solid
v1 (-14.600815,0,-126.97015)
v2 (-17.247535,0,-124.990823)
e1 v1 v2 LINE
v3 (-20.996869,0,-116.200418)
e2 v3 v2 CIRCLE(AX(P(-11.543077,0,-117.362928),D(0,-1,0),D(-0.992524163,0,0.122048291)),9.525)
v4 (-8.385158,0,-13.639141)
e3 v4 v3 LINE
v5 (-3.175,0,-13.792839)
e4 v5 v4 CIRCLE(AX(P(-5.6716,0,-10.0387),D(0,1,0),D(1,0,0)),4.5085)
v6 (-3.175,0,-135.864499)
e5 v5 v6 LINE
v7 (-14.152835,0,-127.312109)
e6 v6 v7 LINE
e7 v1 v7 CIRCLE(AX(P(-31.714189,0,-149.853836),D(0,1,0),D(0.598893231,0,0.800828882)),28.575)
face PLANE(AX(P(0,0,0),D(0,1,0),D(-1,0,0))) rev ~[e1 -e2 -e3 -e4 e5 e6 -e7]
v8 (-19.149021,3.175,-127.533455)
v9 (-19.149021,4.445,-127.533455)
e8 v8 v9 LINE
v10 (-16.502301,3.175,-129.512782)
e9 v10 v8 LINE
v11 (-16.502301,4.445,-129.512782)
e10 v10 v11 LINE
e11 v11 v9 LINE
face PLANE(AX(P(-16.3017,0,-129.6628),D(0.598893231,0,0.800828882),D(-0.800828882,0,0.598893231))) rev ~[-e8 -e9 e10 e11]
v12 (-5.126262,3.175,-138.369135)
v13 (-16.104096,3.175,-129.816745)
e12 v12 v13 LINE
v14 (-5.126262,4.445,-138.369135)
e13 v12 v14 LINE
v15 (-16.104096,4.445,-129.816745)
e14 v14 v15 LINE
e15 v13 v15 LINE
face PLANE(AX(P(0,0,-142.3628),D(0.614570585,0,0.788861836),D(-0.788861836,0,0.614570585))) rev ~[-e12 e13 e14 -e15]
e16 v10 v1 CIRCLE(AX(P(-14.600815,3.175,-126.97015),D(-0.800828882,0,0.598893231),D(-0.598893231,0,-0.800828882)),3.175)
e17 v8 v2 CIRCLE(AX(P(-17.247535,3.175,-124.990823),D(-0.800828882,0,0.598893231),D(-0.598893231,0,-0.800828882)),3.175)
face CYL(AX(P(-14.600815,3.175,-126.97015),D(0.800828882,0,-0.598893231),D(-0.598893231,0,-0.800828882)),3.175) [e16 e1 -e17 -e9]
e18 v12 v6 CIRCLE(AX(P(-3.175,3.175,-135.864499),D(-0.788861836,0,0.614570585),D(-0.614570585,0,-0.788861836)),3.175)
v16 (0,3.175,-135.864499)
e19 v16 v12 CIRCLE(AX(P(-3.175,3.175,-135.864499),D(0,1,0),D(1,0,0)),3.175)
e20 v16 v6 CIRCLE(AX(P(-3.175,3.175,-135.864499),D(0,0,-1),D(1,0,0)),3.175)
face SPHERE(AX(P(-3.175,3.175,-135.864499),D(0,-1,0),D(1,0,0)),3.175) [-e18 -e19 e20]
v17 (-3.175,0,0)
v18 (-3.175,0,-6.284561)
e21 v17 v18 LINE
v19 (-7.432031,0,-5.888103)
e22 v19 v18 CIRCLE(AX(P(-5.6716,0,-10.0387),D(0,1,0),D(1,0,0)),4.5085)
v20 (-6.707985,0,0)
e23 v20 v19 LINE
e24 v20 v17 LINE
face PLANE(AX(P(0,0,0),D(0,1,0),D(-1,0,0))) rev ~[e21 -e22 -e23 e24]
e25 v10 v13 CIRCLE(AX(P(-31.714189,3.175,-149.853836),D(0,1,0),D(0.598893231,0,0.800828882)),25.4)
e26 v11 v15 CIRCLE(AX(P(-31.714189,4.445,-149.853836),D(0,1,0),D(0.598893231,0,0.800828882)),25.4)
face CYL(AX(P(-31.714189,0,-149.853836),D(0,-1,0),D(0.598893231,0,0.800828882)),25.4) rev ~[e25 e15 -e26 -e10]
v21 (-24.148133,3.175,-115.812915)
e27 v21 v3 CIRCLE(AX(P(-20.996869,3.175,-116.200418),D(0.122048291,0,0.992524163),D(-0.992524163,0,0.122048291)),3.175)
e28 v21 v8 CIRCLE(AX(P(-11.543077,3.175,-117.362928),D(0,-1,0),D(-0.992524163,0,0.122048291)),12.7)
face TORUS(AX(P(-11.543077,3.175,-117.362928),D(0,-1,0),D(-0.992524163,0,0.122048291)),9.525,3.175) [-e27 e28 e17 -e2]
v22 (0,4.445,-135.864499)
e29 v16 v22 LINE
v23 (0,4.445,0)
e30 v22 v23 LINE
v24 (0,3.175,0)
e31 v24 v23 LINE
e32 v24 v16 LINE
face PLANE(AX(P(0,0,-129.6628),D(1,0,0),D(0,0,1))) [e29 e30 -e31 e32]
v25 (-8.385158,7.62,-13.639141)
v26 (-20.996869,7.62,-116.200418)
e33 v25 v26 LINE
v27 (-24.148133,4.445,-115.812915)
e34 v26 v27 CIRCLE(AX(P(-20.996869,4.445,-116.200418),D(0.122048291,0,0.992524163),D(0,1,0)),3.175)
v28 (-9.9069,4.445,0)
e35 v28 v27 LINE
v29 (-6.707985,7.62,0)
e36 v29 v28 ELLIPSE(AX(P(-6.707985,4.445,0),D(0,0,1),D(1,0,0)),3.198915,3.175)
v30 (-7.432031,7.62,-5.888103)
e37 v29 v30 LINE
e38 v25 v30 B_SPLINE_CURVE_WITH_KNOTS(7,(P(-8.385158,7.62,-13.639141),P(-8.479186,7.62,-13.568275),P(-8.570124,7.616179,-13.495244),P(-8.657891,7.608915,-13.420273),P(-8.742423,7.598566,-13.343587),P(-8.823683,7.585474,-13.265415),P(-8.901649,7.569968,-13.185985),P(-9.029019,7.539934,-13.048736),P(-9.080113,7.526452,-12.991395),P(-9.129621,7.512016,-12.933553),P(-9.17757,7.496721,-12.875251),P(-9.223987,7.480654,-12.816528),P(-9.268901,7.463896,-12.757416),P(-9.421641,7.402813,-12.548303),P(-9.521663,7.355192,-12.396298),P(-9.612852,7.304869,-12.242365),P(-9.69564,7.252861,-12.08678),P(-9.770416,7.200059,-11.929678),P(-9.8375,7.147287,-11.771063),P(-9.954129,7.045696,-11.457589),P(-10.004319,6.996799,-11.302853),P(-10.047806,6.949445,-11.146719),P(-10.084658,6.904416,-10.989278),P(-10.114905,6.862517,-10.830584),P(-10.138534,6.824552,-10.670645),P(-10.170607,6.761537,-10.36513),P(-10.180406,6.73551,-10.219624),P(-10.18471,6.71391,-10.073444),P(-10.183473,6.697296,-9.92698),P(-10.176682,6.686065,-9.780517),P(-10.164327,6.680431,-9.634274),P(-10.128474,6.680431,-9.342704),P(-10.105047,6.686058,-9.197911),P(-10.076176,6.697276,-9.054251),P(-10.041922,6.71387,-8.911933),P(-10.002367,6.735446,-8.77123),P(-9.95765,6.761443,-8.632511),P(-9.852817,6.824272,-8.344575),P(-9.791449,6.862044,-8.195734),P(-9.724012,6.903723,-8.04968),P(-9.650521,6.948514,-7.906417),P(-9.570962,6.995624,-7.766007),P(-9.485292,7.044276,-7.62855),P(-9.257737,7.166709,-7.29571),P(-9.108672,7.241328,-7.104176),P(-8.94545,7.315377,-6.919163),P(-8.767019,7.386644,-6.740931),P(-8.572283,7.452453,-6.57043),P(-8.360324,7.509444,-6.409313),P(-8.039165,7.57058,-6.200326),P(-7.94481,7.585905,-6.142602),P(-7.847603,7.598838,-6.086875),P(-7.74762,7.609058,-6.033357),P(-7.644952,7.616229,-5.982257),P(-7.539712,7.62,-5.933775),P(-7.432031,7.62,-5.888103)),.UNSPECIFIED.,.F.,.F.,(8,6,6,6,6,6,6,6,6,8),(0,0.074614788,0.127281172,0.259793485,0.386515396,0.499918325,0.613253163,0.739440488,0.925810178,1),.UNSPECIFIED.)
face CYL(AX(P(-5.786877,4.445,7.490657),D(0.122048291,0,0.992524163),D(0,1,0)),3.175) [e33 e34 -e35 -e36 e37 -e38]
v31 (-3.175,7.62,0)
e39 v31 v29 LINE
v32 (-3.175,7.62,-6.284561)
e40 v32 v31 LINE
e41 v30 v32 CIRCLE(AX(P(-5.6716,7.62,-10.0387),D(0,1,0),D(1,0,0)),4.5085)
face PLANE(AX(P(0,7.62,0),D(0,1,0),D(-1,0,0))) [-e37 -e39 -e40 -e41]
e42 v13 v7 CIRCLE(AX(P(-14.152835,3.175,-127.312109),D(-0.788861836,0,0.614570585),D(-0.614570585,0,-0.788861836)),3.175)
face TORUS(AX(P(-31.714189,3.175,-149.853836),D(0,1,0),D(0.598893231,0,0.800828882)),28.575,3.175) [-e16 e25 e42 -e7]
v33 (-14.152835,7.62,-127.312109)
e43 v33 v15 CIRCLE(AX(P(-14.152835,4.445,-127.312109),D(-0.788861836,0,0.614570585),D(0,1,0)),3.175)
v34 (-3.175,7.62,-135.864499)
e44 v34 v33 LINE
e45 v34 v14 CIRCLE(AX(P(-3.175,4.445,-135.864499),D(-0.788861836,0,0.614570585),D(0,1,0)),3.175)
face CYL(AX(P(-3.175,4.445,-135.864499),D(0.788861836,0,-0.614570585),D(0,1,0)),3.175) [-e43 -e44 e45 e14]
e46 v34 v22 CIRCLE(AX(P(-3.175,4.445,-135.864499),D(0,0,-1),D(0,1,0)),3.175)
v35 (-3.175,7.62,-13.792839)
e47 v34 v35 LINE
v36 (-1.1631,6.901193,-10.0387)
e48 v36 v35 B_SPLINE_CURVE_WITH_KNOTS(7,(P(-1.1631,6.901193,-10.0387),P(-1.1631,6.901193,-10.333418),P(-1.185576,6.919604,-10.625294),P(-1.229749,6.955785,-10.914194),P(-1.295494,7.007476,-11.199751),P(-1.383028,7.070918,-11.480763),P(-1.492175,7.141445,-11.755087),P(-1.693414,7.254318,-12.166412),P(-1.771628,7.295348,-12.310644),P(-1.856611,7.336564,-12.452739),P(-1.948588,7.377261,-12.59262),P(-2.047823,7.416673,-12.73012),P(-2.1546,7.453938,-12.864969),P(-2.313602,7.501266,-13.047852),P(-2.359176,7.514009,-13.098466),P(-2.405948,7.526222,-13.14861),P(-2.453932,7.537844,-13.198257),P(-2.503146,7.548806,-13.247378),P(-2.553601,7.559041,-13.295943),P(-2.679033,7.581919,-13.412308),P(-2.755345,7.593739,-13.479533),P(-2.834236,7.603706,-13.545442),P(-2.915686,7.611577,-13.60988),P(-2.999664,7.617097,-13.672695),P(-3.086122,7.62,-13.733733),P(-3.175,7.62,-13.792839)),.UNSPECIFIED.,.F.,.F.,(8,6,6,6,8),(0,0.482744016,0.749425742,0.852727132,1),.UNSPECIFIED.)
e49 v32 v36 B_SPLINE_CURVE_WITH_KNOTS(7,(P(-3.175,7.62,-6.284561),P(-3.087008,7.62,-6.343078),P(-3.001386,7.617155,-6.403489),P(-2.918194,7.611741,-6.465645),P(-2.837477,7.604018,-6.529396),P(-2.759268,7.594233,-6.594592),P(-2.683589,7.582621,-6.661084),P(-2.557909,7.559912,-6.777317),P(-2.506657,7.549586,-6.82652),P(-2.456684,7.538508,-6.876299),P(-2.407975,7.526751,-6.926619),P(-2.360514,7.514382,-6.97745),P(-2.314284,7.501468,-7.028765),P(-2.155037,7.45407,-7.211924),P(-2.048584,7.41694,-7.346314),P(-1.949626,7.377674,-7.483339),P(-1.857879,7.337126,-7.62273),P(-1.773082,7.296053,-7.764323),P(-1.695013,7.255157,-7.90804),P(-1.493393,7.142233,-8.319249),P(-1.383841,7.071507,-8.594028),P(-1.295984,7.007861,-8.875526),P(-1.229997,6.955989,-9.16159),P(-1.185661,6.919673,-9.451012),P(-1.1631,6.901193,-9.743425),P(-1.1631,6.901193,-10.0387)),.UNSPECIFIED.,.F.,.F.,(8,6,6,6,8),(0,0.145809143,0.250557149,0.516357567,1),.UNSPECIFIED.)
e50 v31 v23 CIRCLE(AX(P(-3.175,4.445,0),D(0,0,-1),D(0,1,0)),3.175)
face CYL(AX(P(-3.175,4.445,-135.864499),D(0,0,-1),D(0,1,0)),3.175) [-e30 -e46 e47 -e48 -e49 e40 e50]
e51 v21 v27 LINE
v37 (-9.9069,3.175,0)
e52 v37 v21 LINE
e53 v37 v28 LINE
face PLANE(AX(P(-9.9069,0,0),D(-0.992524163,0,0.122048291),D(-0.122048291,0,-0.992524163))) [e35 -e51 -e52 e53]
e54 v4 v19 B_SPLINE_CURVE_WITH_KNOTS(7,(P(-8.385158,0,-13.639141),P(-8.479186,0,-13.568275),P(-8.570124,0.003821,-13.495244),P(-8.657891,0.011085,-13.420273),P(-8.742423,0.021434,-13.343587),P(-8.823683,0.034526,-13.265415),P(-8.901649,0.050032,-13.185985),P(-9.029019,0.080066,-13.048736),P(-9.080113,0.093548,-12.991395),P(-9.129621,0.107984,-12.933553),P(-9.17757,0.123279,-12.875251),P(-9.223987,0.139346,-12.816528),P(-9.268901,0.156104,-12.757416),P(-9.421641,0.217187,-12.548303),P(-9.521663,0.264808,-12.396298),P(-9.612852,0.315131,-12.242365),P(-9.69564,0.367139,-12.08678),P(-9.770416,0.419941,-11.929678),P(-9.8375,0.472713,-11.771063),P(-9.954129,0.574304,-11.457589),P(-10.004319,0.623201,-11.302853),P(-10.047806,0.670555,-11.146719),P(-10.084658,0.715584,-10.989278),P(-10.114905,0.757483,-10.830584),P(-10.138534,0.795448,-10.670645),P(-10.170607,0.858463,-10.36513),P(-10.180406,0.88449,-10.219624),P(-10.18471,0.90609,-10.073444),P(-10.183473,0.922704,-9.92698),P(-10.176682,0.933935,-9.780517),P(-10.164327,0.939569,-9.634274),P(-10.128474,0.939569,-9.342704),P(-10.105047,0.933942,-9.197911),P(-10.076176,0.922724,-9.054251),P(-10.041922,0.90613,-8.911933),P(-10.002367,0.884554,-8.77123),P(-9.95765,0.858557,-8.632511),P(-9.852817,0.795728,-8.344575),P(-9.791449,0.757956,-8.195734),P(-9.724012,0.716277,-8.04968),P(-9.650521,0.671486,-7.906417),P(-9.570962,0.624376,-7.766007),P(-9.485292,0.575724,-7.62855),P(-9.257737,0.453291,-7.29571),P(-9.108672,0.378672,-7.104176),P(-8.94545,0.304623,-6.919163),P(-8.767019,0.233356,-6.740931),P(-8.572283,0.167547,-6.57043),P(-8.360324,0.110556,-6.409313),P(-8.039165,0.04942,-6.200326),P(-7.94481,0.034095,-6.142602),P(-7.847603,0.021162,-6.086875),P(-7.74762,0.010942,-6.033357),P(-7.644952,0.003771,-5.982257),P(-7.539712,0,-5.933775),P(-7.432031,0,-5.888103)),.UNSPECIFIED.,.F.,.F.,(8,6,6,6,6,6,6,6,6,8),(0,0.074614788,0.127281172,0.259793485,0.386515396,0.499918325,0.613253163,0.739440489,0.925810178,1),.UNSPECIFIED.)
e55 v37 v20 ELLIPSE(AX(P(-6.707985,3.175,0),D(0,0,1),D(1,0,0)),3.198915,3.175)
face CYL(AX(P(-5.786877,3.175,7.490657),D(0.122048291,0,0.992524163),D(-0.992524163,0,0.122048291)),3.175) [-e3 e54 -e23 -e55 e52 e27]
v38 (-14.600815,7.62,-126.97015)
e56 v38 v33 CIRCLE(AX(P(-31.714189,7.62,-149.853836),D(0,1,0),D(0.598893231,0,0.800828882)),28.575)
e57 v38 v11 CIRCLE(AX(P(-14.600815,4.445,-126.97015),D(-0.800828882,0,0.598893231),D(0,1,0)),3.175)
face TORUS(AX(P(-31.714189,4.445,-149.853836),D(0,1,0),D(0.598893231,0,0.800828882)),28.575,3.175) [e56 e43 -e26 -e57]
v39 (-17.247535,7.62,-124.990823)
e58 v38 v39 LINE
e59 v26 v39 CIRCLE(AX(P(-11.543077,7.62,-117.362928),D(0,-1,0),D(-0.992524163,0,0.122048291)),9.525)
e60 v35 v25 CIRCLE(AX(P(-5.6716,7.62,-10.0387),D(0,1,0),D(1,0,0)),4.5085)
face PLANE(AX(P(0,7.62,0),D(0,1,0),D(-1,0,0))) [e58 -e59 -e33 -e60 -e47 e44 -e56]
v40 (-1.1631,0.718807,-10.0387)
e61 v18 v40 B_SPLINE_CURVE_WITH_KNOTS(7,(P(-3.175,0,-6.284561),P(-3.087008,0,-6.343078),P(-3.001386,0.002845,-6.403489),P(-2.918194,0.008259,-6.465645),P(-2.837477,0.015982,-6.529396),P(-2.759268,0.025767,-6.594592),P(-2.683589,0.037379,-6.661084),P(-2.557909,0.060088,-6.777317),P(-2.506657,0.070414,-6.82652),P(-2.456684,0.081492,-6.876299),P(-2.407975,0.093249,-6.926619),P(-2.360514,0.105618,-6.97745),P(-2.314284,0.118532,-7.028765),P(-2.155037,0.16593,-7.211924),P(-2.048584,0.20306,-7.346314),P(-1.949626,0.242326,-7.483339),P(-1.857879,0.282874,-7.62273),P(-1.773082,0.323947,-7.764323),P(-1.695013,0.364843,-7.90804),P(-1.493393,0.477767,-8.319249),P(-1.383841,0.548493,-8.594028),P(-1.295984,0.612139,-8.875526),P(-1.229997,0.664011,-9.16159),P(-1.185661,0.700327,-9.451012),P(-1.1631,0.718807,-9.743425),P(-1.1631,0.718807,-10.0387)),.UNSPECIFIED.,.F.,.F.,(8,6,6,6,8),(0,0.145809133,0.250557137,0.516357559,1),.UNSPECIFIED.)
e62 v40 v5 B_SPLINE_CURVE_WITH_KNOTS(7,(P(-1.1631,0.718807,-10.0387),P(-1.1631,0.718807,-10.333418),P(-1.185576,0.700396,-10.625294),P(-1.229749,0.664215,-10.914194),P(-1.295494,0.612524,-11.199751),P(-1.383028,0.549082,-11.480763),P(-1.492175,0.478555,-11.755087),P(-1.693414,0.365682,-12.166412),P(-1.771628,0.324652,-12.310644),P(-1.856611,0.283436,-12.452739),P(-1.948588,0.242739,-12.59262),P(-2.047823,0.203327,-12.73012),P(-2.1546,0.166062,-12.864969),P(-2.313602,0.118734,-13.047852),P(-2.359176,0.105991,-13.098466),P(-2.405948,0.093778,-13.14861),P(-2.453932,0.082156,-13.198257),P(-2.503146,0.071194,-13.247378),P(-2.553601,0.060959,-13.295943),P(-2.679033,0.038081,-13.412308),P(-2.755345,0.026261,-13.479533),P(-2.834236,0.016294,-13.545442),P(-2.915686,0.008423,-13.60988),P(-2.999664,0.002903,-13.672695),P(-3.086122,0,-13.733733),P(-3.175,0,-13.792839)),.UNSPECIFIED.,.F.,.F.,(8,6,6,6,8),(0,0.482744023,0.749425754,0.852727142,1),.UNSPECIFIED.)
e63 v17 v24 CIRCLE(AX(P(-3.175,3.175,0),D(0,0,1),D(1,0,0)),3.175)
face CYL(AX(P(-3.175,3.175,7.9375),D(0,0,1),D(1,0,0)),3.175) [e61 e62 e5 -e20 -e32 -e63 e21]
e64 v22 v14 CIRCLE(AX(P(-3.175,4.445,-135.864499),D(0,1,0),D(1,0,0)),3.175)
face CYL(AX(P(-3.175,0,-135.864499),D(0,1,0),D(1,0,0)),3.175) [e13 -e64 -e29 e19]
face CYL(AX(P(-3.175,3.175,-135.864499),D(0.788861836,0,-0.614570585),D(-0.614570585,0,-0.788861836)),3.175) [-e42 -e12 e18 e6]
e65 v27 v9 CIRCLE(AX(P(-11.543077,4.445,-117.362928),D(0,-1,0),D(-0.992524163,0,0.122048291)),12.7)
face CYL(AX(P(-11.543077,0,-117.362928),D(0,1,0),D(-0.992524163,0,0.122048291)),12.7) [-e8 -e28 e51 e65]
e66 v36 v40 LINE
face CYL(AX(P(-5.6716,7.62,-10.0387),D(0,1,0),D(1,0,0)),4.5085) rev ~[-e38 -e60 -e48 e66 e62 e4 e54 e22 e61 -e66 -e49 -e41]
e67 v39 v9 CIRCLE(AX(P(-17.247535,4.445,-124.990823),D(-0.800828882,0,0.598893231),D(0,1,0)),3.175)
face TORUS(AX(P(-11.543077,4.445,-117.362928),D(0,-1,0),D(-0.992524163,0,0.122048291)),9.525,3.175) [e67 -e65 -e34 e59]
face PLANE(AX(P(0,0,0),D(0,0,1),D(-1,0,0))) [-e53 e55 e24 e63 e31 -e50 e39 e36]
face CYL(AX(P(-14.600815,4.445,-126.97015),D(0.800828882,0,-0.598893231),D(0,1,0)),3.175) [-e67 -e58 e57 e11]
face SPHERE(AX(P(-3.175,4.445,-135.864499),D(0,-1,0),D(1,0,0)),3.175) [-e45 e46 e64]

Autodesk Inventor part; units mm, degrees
ref_plane "YZ Plane" through (0, 0, 0) normal (1, 0, 0) x (0, 1, 0)
ref_plane "XZ Plane" through (0, 0, 0) normal (0, 1, 0) x (-1, 0, 0)
ref_plane "XY Plane" through (0, 0, 0) normal (0, 0, 1) x (1, 0, 0)
sketch "Sketch1" plane through (0, 0, 0) normal (0, 1, 0) x (-1, 0, 0)
  line L0 (0, 0) -> (12.7, 0)
  line L1 (0, -129.6628) -> (0, 0)
  line L2 (0, -129.6628) -> (0, -142.3628)
  line L3 (0, -142.3628) -> (16.3017, -129.6628)
  line L4 (0, 0) -> (6.35, 0)
  line L5 (16.3017, -129.6628) -> (25.047, -123.1227)
  line L6 (6.35, 0) -> (18.1234, 0)
  line L7 (9.9069, 0) -> (25.047, -123.1227)
  circle A0 centre (4.9306, -5.8204) radius 4.445
  dimension "d10" = 8.89
sketch "Sketch2" plane through (0, 0, 0) normal (0, 1, 0) x (-1, 0, 0)
  point P0 (0, 0)
extrude "Extrusion1" add sketch "Sketch1" along normal blind 7.62 contours L0 L7 L5 L3 L2 L1 | A0
fillet "Fillet1" radius 25.4 1 edges at (-16.3017, 3.81, -129.6628)
sketch "Sketch3" plane through (0, 7.62, 0) normal (0, 1, 0) x (1, 0, 0)
  point P0 (0, 0)
sketch "Sketch4" plane through (0, 7.62, 0) normal (0, 1, 0) x (1, 0, 0)
  point P0 (0, 0)
sketch "Sketch5" plane through (0, 7.62, 0) normal (0, 1, 0) x (1, 0, 0)
  circle A0 centre (-5.6716, 10.0387) radius 4.5085
  point P0 (0, 0)
  dimension "d11" = 9.017
extrude "Extrusion2" cut sketch "Sketch5" against normal through all
fillet "Fillet2" radius 12.7 1 edges at (-25.047, 3.81, -123.1227)
fillet "Fillet3" radius 3.175 1 edges at (0, 3.81, -142.3628)
fillet "Fillet4" radius 3.175 12 edges at (-1.7812, 0, -138.7172) (-10.6152, 0, -134.0929) (-17.8257, 0, -128.5231) (-23.2248, 0, -122.3455) (-17.0275, 0, -57.9065) (0, 0, -67.9322) (-1.7812, 7.62, -138.7172) (-10.6152, 7.62, -134.0929) (-17.8257, 7.62, -128.5231) (-23.2248, 7.62, -122.3455) (-17.0275, 7.62, -57.9065) (0, 7.62, -67.9322)
properties part number "cock clamp" material "PC/ABS Plastic"
